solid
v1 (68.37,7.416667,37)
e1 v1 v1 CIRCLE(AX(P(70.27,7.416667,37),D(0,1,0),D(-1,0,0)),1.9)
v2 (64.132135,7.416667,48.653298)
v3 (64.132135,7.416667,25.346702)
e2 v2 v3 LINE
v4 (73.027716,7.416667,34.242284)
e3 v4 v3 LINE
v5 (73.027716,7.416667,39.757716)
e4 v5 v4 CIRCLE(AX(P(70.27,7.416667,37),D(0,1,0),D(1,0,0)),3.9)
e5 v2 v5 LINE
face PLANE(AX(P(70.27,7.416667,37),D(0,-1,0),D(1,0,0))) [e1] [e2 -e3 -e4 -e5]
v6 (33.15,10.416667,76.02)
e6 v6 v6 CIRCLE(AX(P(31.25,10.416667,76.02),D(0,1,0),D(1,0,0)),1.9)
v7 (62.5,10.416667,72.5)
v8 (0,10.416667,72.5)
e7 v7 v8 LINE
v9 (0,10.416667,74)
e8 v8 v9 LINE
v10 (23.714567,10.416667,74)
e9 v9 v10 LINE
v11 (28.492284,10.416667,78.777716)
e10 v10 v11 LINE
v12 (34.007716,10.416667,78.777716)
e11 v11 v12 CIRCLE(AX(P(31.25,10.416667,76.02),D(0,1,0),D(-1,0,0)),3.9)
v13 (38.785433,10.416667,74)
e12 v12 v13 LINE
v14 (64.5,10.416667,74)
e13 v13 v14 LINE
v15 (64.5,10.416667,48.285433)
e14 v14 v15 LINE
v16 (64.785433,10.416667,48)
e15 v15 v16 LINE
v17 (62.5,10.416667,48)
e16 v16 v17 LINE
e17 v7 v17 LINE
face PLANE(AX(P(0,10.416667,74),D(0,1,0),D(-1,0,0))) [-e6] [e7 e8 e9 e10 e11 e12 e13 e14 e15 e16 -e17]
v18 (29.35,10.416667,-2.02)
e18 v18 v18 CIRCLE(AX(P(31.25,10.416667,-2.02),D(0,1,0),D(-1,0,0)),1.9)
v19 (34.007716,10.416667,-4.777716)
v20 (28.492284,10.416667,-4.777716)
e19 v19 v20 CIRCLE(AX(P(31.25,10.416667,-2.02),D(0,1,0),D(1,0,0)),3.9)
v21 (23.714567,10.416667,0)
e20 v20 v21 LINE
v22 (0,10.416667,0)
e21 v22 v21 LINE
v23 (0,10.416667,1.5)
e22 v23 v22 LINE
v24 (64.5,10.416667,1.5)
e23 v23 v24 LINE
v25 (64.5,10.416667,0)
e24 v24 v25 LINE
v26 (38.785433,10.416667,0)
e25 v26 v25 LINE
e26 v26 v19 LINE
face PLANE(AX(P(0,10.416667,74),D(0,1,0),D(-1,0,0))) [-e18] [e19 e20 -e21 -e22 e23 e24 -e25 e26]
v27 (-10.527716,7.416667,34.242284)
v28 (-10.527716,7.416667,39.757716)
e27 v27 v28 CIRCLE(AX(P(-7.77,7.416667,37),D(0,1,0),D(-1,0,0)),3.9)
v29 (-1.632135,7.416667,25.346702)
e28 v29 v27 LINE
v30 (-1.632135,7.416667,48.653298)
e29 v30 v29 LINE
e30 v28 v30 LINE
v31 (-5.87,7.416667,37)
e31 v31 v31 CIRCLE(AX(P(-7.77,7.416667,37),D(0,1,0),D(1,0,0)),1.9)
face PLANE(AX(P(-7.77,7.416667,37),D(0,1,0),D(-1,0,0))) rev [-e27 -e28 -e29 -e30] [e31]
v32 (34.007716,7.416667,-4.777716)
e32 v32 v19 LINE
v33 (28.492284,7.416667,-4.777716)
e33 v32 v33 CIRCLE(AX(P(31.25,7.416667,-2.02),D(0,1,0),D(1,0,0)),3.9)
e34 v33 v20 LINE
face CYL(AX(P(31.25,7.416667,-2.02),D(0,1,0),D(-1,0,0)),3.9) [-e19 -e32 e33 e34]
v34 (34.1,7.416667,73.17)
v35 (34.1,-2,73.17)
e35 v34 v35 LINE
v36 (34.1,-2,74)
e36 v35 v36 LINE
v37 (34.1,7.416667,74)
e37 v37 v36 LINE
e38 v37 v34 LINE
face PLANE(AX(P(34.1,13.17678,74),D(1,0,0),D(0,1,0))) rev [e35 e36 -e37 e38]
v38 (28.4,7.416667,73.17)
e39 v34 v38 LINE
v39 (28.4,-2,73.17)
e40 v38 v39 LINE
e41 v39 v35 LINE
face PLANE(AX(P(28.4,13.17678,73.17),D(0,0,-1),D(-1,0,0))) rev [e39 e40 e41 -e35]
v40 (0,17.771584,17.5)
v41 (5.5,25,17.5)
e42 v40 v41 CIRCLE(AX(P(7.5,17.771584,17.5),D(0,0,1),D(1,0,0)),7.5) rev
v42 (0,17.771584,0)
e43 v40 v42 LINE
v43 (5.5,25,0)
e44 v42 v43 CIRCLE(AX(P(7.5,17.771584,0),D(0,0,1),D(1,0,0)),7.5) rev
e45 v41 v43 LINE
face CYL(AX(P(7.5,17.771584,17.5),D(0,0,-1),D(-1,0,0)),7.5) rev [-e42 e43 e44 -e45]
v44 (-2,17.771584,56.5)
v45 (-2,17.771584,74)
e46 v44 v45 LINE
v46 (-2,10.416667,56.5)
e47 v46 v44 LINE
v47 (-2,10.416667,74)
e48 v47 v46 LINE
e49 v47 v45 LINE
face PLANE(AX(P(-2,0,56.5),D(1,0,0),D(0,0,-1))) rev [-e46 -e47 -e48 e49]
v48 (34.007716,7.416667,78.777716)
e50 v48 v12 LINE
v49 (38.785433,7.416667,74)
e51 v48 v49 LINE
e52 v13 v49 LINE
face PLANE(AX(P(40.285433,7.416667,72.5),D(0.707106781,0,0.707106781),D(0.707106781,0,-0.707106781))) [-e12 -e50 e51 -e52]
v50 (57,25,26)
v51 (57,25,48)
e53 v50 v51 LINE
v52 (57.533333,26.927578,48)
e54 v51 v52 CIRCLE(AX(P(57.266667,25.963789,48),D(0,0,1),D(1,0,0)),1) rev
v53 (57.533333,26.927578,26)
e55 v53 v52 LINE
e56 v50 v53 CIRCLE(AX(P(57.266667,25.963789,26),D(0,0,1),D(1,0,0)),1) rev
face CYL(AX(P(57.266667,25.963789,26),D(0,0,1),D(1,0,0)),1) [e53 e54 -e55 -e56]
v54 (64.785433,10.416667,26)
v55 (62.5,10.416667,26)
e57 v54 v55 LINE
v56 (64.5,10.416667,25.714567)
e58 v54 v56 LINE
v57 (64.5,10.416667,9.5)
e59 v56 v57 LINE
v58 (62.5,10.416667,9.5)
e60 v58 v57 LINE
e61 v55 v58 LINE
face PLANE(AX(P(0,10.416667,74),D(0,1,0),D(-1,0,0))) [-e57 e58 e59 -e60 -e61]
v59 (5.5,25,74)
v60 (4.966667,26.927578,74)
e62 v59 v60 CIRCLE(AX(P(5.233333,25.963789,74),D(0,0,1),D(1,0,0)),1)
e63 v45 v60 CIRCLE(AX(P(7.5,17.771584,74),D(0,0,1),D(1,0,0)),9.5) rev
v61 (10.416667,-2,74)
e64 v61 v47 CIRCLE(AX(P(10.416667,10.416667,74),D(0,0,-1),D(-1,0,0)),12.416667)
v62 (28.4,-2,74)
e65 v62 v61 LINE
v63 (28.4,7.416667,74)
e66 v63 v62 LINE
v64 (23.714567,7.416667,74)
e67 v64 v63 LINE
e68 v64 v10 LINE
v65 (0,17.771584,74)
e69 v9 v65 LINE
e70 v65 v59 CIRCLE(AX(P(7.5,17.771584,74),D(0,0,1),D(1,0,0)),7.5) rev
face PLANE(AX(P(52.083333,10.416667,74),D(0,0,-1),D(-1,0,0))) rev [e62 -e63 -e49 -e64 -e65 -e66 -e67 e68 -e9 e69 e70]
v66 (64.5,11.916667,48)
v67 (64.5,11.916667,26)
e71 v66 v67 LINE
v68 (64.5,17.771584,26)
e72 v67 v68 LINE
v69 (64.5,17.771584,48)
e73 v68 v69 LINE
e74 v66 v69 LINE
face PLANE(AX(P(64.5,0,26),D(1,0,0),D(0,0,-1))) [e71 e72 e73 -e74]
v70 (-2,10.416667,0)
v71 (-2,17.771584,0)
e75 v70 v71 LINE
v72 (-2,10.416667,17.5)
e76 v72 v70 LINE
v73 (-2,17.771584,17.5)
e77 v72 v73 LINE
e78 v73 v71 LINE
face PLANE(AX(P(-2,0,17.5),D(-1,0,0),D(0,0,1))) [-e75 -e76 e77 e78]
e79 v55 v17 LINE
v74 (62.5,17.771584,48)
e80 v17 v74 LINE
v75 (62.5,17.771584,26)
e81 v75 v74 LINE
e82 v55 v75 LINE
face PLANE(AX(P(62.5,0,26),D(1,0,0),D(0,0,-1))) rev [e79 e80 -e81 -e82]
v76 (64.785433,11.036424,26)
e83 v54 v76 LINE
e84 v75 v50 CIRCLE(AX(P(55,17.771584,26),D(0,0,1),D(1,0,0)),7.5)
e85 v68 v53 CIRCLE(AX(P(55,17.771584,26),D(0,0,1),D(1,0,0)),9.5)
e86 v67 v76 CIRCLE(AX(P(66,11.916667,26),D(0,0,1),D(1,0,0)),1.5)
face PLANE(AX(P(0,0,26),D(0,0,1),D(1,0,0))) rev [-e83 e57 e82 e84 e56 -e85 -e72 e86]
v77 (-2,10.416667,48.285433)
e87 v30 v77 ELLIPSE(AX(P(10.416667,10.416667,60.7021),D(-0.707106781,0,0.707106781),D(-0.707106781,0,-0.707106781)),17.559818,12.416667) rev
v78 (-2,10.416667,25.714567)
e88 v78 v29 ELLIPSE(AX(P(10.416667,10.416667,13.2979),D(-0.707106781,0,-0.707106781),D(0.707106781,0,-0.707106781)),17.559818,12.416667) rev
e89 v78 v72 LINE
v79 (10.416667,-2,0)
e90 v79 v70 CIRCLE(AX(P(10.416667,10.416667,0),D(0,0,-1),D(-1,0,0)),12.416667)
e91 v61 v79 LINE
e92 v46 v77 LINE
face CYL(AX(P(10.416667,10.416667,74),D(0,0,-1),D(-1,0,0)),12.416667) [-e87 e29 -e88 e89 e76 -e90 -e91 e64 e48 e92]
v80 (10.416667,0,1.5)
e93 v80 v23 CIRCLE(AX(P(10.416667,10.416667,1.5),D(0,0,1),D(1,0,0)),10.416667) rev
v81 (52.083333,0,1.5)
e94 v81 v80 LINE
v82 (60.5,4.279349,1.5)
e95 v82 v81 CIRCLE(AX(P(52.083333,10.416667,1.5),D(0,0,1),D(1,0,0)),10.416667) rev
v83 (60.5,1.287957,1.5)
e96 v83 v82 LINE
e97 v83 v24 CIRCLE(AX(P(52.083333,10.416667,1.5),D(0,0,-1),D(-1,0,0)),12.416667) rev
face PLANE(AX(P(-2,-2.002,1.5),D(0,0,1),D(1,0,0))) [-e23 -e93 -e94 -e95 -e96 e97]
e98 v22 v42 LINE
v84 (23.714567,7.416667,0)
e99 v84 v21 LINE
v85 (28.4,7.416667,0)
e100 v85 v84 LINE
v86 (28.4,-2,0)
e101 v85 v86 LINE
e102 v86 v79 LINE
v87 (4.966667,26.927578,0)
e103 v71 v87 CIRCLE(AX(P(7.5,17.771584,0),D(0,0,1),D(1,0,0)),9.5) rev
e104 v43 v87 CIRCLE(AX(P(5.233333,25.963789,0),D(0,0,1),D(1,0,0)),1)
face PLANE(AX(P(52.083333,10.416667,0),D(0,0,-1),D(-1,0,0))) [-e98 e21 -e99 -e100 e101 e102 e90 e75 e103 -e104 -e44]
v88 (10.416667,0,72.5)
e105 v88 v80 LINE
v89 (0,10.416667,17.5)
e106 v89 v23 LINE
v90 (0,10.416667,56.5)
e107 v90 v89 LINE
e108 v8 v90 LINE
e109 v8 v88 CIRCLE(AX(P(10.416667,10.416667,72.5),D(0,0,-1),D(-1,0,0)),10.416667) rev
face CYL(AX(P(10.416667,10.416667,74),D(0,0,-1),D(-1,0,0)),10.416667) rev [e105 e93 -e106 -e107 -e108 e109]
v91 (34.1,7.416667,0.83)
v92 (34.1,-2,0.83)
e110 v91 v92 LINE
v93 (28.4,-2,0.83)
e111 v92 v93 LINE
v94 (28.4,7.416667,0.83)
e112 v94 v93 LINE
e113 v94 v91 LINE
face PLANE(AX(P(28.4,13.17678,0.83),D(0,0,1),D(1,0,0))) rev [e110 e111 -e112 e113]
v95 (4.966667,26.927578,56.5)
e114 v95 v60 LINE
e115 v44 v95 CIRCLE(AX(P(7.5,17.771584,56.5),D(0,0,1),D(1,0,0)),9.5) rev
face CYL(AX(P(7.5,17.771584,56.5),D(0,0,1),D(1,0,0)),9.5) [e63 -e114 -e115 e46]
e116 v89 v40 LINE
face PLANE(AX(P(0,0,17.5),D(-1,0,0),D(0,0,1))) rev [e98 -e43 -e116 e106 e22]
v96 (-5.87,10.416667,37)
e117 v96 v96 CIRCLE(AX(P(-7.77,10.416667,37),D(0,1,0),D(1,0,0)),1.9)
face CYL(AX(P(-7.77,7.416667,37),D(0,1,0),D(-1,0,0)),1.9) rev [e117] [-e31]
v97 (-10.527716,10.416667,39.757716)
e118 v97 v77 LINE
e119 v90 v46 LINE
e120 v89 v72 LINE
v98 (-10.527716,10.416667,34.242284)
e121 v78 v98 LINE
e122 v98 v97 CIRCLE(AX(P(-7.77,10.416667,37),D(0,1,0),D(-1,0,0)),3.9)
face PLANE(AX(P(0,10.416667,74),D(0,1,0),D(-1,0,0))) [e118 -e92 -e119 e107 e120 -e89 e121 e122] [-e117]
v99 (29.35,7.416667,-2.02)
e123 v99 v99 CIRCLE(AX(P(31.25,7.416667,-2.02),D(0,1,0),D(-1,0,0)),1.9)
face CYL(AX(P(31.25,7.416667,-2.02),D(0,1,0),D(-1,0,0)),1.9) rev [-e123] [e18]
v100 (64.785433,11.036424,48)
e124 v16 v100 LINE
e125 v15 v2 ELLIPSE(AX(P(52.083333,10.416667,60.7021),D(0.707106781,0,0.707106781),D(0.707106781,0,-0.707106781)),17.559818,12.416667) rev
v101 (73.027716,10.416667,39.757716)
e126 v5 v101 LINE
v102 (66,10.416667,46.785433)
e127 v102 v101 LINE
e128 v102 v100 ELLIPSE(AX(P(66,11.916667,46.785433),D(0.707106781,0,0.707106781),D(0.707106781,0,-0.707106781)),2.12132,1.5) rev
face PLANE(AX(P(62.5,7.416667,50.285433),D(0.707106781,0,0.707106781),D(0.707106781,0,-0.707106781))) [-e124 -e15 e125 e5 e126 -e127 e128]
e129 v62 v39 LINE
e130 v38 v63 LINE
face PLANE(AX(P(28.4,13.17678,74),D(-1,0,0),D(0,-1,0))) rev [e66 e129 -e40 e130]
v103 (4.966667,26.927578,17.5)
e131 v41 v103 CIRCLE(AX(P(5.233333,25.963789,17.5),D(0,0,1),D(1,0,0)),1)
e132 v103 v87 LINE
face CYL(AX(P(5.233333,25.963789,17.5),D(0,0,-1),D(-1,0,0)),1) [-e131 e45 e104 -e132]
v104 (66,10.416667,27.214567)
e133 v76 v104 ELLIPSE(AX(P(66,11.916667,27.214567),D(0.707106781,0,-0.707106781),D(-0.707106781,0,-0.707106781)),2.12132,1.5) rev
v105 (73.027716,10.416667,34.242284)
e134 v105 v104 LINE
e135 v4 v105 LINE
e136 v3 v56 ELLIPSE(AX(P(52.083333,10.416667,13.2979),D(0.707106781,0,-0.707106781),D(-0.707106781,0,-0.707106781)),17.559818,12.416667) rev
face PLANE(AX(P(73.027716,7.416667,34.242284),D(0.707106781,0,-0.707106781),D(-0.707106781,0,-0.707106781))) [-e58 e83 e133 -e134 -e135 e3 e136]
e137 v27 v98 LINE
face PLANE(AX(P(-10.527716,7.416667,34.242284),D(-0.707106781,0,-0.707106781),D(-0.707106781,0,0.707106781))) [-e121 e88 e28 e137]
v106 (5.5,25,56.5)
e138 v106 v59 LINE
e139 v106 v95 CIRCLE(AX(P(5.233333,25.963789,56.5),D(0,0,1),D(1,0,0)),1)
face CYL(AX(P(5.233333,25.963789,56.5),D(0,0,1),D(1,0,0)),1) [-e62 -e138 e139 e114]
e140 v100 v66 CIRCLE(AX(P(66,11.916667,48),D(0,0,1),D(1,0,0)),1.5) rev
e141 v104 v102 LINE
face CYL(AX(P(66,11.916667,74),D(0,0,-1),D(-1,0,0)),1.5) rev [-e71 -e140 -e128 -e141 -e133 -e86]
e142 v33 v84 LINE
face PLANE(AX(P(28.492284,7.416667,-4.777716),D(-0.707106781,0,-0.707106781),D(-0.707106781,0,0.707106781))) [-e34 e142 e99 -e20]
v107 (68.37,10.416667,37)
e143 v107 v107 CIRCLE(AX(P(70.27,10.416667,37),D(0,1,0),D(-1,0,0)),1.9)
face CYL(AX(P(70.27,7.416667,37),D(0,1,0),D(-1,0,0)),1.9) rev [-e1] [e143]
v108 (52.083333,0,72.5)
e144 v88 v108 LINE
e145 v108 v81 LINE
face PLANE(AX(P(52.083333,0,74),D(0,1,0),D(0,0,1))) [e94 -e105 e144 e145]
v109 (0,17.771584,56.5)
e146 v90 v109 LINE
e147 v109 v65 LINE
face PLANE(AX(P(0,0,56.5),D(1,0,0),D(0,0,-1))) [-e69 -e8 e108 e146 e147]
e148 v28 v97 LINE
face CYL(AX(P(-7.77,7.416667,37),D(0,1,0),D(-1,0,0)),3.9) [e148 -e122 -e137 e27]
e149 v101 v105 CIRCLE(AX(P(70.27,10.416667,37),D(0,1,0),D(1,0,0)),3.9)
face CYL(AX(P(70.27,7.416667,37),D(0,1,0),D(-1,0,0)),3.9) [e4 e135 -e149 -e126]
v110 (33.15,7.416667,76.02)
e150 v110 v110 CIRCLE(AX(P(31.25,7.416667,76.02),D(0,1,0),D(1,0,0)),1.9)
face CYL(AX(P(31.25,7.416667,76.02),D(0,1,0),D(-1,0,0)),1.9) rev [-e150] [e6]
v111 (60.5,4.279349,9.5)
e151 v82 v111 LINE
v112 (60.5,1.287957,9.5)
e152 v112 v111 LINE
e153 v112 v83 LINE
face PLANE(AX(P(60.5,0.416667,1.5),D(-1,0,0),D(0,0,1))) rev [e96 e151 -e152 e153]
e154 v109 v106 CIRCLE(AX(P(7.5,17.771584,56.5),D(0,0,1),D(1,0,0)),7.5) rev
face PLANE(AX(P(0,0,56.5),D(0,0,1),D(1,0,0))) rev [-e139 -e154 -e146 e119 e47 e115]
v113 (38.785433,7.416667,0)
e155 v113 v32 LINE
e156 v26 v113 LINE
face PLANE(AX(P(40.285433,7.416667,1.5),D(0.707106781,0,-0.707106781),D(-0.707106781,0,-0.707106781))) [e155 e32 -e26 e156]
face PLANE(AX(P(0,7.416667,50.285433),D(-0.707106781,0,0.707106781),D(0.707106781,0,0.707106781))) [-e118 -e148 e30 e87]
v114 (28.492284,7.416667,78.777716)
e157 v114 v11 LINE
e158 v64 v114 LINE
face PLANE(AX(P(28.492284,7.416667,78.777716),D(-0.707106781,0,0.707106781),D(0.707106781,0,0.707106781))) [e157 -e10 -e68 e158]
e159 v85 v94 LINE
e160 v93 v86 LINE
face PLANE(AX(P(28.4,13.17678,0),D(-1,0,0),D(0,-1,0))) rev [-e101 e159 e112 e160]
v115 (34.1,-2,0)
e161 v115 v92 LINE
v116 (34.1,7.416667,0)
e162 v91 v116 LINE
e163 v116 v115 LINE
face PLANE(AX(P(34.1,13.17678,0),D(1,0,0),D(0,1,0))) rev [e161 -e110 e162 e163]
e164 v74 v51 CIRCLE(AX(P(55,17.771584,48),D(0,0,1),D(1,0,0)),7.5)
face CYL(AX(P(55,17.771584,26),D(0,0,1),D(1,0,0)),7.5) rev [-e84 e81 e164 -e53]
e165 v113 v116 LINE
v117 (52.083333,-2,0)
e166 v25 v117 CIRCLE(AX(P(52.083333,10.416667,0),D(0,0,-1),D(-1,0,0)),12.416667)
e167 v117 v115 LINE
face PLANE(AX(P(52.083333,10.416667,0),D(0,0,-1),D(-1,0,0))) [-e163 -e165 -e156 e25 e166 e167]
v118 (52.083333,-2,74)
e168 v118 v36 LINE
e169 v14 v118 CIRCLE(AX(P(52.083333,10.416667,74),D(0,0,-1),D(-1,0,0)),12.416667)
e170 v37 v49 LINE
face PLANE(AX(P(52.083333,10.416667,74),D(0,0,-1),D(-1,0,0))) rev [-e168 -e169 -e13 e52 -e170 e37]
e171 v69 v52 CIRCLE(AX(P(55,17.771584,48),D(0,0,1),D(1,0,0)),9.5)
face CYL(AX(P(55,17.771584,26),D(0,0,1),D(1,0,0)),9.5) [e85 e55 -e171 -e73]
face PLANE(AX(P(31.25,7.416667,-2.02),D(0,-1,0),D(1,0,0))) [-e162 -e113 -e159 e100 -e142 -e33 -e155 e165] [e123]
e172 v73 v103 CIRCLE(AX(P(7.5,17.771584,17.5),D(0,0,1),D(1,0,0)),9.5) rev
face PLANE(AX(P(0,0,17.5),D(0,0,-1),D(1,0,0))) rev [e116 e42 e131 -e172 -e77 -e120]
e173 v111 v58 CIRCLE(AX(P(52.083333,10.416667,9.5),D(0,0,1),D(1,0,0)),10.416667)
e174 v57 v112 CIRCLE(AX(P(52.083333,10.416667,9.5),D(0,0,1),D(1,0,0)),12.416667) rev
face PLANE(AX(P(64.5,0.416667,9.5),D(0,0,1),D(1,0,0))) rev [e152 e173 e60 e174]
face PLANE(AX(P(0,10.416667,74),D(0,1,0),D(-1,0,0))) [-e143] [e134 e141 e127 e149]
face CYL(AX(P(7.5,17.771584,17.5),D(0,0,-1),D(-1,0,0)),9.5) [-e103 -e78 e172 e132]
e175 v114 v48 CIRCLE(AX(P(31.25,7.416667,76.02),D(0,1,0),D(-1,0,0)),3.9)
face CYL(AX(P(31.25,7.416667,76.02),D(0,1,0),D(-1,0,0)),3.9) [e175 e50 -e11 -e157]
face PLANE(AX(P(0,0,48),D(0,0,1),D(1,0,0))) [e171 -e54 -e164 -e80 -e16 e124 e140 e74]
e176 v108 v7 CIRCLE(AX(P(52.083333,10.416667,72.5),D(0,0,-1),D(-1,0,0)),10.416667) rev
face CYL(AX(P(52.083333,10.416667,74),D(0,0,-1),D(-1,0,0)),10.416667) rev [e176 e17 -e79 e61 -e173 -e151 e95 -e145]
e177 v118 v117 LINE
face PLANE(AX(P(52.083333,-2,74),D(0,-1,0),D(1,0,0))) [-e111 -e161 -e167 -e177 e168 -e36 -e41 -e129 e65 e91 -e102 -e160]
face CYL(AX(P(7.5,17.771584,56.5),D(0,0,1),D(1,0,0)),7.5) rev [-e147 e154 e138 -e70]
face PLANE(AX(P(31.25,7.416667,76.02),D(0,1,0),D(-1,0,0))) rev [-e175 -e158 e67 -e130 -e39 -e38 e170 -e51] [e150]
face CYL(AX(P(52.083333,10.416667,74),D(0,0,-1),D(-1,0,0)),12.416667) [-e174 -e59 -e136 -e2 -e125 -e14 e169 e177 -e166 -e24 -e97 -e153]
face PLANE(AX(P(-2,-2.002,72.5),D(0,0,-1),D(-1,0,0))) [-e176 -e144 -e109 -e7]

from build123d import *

# Parameters (mm, degrees)
SKETCH1_R           = 10.416666668
SKETCH1_R_2         = 10.416666667
BOSS_EXTRUDE1_DEPTH = 65
FILLET1_R           = 2
BOSS_EXTRUDE2_DEPTH = 74
BOSS_EXTRUDE3_REACH = 100.947
SKETCH3_W           = 66.5
SKETCH3_H           = 1.5
SKETCH4_R           = 1.9
BOSS_EXTRUDE4_DEPTH = 3
SKETCH5_W           = 4
SKETCH5_H           = 8
CUT_EXTRUDE1_DEPTH  = 10
BOSS_EXTRUDE5_START = -26
BOSS_EXTRUDE5_DEPTH = 22
BOSS_EXTRUDE6_DEPTH = 17.5
FILLET2_R           = 1.5
SKETCH8_W           = 5.7
SKETCH8_H           = 0.83
CUT_EXTRUDE4_DEPTH  = 9.416666667


with BuildPart() as part:
    # Sketch1 → Boss-Extrude1 (new body)
    with BuildSketch(Plane.XY):
        with Locations((10.416666667, 10.416666667)):
            Circle(SKETCH1_R)
        with BuildLine():
            ThreePointArc((20.833333333, 10.416666667), (21.626254869, 14.402952421), (23.884304362, 17.782362305))
            ThreePointArc((23.884304363, 17.782362304), (20.833333333, 16.518608725), (17.782362304, 17.782362304))
            ThreePointArc((17.782362305, 17.782362305), (20.040411798, 14.402952421), (20.833333335, 10.416666667))
        make_face()
        with BuildLine():
            ThreePointArc((17.782362304, 3.050971029), (20.833333333, 4.314724608), (23.884304363, 3.050971029))
            ThreePointArc((23.884304362, 3.050971029), (21.626254869, 6.430380913), (20.833333333, 10.416666667))
            ThreePointArc((20.833333335, 10.416666667), (20.040411798, 6.430380912), (17.782362305, 3.050971028))
        make_face()
        with Locations((31.25, 10.416666667)):
            Circle(SKETCH1_R_2)
        with BuildLine():
            ThreePointArc((44.717637696, 3.050971029), (42.459588203, 6.430380913), (41.666666666, 10.416666667))
            ThreePointArc((41.666666667, 10.416666667), (40.873745131, 6.430380913), (38.615695638, 3.050971029))
            ThreePointArc((38.615695637, 3.050971029), (41.666666667, 4.314724608), (44.717637696, 3.050971029))
        make_face()
        with BuildLine():
            ThreePointArc((38.615695638, 17.782362305), (40.873745131, 14.402952421), (41.666666667, 10.416666667))
            ThreePointArc((41.666666666, 10.416666667), (42.459588203, 14.402952421), (44.717637696, 17.782362304))
            ThreePointArc((44.717637696, 17.782362304), (41.666666667, 16.518608725), (38.615695637, 17.782362304))
        make_face()
        with Locations((52.083333333, 10.416666667)):
            Circle(SKETCH1_R_2)
    extrude(amount=BOSS_EXTRUDE1_DEPTH)

    # Fillet1
    fillet1_edges = [part.edges().sort_by_distance(p)[0] for p in [
        (31.25, -1e-09, 65),
        (31.25, 20.833333334, 0),
        (41.666666667, 16.518608725, 0),
        (62.5, 10.416666667, 0),
        (41.666666667, 4.314724608, 0),
        (31.25, -1e-09, 0),
        (20.833333333, 4.314724608, 0),
        (41.666666667, 4.314724608, 65),
        (62.5, 10.416666667, 65),
        (41.666666667, 16.518608725, 65),
        (31.25, 20.833333334, 65),
        (20.833333333, 16.518608725, 65),
        (-1e-09, 10.416666667, 65),
        (20.833333333, 4.314724608, 65),
        (-1e-09, 10.416666667, 0),
        (20.833333333, 16.518608725, 0),
    ]]
    fillet(fillet1_edges, radius=FILLET1_R)


with BuildPart() as body_2:
    # Sketch2 → Boss-Extrude2 (new body)
    with BuildSketch(Plane(origin=(0, 0, 0), x_dir=(-1, 0, 0), z_dir=(0, 0, -1))):
        with BuildLine():
            Line((-52.083333333, 0), (-10.416666667, 0))
            ThreePointArc((-10.416666667, 0), (-3.050971029, 3.050971029), (1e-09, 10.416666667))
            Line((1e-09, 10.416666667), (2.000000001, 10.416666667))
            ThreePointArc((2.000000001, 10.416666667), (-1.636757467, 1.636757467), (-10.416666667, -2))
            Line((-10.416666667, -2), (-52.083333333, -2))
            ThreePointArc((-52.083333333, -2), (-60.863242533, 1.636757467), (-64.5, 10.416666667))
            Line((-64.5, 10.416666667), (-62.5, 10.416666667))
            ThreePointArc((-62.5, 10.416666667), (-59.449028971, 3.050971029), (-52.083333333, 0))
        make_face()
    extrude(amount=-BOSS_EXTRUDE2_DEPTH)

    # Sketch3 → Boss-Extrude3 (add, up to next)
    with BuildSketch(Plane(origin=(0, 10.416666667, 0), x_dir=(1, 0, 0), z_dir=(0, 1, 0)), mode=Mode.PRIVATE) as boss_extrude3_sk1:
        with Locations((31.25, -0.75)):
            Rectangle(SKETCH3_W, SKETCH3_H)
    boss_extrude3_tool1 = extrude(boss_extrude3_sk1.sketch, amount=-BOSS_EXTRUDE3_REACH, mode=Mode.PRIVATE) - body_2.part
    # Sketch3 → Boss-Extrude3 (add, up to next)
    with BuildSketch(Plane(origin=(0, 10.416666667, 0), x_dir=(1, 0, 0), z_dir=(0, 1, 0)), mode=Mode.PRIVATE) as boss_extrude3_sk2:
        with Locations((31.25, -73.25)):
            Rectangle(SKETCH3_W, SKETCH3_H)
    boss_extrude3_tool2 = extrude(boss_extrude3_sk2.sketch, amount=-BOSS_EXTRUDE3_REACH, mode=Mode.PRIVATE) - body_2.part
    add(boss_extrude3_tool1.solids().sort_by_distance((31.25, 10.416667, 0.75))[0])
    add(boss_extrude3_tool2.solids().sort_by_distance((31.25, 10.416667, 73.25))[0])

    # Sketch4 → Boss-Extrude4 (add)
    # profile 1 of 4: a face of its own
    with BuildSketch(Plane(origin=(0, 10.416666667, 0), x_dir=(1, 0, 0), z_dir=(0, 1, 0))):
        with BuildLine():
            Line((28.492283553, 4.777716447), (22.214567107, -1.5))
            Line((22.214567107, -1.5), (40.285432893, -1.5))
            Line((40.285432893, -1.5), (34.007716446, 4.777716447))
            ThreePointArc((34.007716446, 4.777716447), (31.25, 5.92), (28.492283553, 4.777716447))
        make_face()
        with Locations(Location((31.25, 2.02, 0), (0, 0, 180))):
            Circle(SKETCH4_R, mode=Mode.SUBTRACT)
    # profile 2 of 4: a face of its own
    with BuildSketch(Plane(origin=(0, 10.416666667, 0), x_dir=(1, 0, 0), z_dir=(0, 1, 0))):
        with BuildLine():
            Line((73.027716447, -34.242283553), (62.5, -23.714567107))
            Line((62.5, -23.714567107), (62.5, -50.285432893))
            Line((62.5, -50.285432893), (73.027716447, -39.757716447))
            ThreePointArc((73.027716447, -39.757716447), (74.17, -37), (73.027716447, -34.242283553))
        make_face()
        with Locations(Location((70.27, -37, 0), (0, 0, 180))):
            Circle(SKETCH4_R, mode=Mode.SUBTRACT)
    # profile 3 of 4: a face of its own
    with BuildSketch(Plane(origin=(0, 10.416666667, 0), x_dir=(1, 0, 0), z_dir=(0, 1, 0))):
        with BuildLine():
            Line((0, -23.714567107), (0, -50.285432893))
            Line((0, -50.285432893), (-10.527716447, -39.757716447))
            ThreePointArc((-10.527716447, -39.757716447), (-11.67, -37), (-10.527716447, -34.242283553))
            Line((-10.527716447, -34.242283553), (0, -23.714567107))
        make_face()
        with Locations((-7.77, -37)):
            Circle(SKETCH4_R, mode=Mode.SUBTRACT)
    # profile 4 of 4: a face of its own
    with BuildSketch(Plane(origin=(0, 10.416666667, 0), x_dir=(1, 0, 0), z_dir=(0, 1, 0))):
        with BuildLine():
            Line((22.214567107, -72.5), (40.285432893, -72.5))
            Line((40.285432893, -72.5), (34.007716446, -78.777716447))
            ThreePointArc((34.007716446, -78.777716447), (31.25, -79.92), (28.492283553, -78.777716447))
            Line((28.492283553, -78.777716447), (22.214567107, -72.5))
        make_face()
        with Locations((31.25, -76.02)):
            Circle(SKETCH4_R, mode=Mode.SUBTRACT)
    extrude(amount=-BOSS_EXTRUDE4_DEPTH)

    # Sketch5 → Cut-Extrude1 (cut)
    with BuildSketch(Plane(origin=(0, 10.416666667, 0), x_dir=(1, 0, 0), z_dir=(0, 1, 0))):
        with Locations((62.5, -5.5)):
            Rectangle(SKETCH5_W, SKETCH5_H)
    extrude(amount=-CUT_EXTRUDE1_DEPTH, mode=Mode.SUBTRACT)

    # Sketch6 → Boss-Extrude5 (add)
    with BuildSketch(Plane.XY.offset(74).offset(BOSS_EXTRUDE5_START)):
        with BuildLine():
            Line((62.5, 10.416666667), (64.5, 10.416666667))
            Line((64.5, 10.416666667), (64.5, 12.416666667))
            Line((64.5, 12.416666667), (64.5, 17.771583853))
            ThreePointArc((64.5, 17.771583853), (62.560313045, 23.524119525), (57.533333333, 26.927577639))
            ThreePointArc((57.533333333, 26.927577639), (56.302877847, 26.230455486), (57, 25))
            ThreePointArc((57, 25), (60.968668193, 22.313059384), (62.5, 17.771583853))
            Line((62.5, 17.771583853), (62.5, 10.416666667))
        make_face()
    extrude(amount=-BOSS_EXTRUDE5_DEPTH)

    # Sketch6<3> → Boss-Extrude6 (add)
    with BuildSketch(Plane.XY.offset(74)):
        with BuildLine():
            Line((-2, 12.416666667), (-2, 10.416666667))
            Line((-2, 10.416666667), (0, 10.416666667))
            Line((0, 10.416666667), (0, 17.771583853))
            ThreePointArc((0, 17.771583853), (1.531331806, 22.313059384), (5.5, 25))
            ThreePointArc((5.5, 25), (6.197122153, 26.230455486), (4.966666666, 26.927577639))
            ThreePointArc((4.966666666, 26.927577639), (-0.060313045, 23.524119525), (-2, 17.771583853))
            Line((-2, 17.771583853), (-2, 12.416666667))
        make_face()
    boss_extrude6 = extrude(amount=-BOSS_EXTRUDE6_DEPTH)

    # Mirror1: Boss-Extrude6 across plane
    add(boss_extrude6.mirror(Plane.XY.offset(37)))

    # Fillet2
    # the kernel refuses this fillet: 1.5 mm, written as the material it adds along each edge
    with BuildSketch(Plane(origin=(64.5, 10.416666667, 48), x_dir=(1, 0, 0), z_dir=(0, 0, -1))) as fillet2_piece_1_section:
        with BuildLine():
            CenterArc((FILLET2_R, -FILLET2_R), FILLET2_R, 90, 90)
            Line((0, -FILLET2_R), (0, 0))
            Line((0, 0), (FILLET2_R, 0))
        make_face()
    fillet2_piece_1 = extrude(amount=22, mode=Mode.PRIVATE)
    fillet2_piece_1 = split(fillet2_piece_1, bisect_by=Plane(origin=(70.314772408, 10.761109215, 42.470660485), z_dir=(-0.7071067811865509, 0, -0.7071067811865442)), keep=Keep.TOP, mode=Mode.PRIVATE)
    fillet2_piece_1 = split(fillet2_piece_1, bisect_by=Plane(origin=(70.314772408, 10.761109215, 31.529339515), z_dir=(-0.7071067811865515, 0, 0.7071067811865436)), keep=Keep.TOP, mode=Mode.PRIVATE)
    add(fillet2_piece_1)

    # Sketch8 → Cut-Extrude4 (cut)
    with BuildSketch(Plane.XZ.offset(2)):
        with Locations((31.25, 0.415)):
            Rectangle(SKETCH8_W, SKETCH8_H)
        with Locations((31.25, 73.585)):
            Rectangle(SKETCH8_W, SKETCH8_H)
    extrude(amount=-CUT_EXTRUDE4_DEPTH, mode=Mode.SUBTRACT)


solid = body_2.part
